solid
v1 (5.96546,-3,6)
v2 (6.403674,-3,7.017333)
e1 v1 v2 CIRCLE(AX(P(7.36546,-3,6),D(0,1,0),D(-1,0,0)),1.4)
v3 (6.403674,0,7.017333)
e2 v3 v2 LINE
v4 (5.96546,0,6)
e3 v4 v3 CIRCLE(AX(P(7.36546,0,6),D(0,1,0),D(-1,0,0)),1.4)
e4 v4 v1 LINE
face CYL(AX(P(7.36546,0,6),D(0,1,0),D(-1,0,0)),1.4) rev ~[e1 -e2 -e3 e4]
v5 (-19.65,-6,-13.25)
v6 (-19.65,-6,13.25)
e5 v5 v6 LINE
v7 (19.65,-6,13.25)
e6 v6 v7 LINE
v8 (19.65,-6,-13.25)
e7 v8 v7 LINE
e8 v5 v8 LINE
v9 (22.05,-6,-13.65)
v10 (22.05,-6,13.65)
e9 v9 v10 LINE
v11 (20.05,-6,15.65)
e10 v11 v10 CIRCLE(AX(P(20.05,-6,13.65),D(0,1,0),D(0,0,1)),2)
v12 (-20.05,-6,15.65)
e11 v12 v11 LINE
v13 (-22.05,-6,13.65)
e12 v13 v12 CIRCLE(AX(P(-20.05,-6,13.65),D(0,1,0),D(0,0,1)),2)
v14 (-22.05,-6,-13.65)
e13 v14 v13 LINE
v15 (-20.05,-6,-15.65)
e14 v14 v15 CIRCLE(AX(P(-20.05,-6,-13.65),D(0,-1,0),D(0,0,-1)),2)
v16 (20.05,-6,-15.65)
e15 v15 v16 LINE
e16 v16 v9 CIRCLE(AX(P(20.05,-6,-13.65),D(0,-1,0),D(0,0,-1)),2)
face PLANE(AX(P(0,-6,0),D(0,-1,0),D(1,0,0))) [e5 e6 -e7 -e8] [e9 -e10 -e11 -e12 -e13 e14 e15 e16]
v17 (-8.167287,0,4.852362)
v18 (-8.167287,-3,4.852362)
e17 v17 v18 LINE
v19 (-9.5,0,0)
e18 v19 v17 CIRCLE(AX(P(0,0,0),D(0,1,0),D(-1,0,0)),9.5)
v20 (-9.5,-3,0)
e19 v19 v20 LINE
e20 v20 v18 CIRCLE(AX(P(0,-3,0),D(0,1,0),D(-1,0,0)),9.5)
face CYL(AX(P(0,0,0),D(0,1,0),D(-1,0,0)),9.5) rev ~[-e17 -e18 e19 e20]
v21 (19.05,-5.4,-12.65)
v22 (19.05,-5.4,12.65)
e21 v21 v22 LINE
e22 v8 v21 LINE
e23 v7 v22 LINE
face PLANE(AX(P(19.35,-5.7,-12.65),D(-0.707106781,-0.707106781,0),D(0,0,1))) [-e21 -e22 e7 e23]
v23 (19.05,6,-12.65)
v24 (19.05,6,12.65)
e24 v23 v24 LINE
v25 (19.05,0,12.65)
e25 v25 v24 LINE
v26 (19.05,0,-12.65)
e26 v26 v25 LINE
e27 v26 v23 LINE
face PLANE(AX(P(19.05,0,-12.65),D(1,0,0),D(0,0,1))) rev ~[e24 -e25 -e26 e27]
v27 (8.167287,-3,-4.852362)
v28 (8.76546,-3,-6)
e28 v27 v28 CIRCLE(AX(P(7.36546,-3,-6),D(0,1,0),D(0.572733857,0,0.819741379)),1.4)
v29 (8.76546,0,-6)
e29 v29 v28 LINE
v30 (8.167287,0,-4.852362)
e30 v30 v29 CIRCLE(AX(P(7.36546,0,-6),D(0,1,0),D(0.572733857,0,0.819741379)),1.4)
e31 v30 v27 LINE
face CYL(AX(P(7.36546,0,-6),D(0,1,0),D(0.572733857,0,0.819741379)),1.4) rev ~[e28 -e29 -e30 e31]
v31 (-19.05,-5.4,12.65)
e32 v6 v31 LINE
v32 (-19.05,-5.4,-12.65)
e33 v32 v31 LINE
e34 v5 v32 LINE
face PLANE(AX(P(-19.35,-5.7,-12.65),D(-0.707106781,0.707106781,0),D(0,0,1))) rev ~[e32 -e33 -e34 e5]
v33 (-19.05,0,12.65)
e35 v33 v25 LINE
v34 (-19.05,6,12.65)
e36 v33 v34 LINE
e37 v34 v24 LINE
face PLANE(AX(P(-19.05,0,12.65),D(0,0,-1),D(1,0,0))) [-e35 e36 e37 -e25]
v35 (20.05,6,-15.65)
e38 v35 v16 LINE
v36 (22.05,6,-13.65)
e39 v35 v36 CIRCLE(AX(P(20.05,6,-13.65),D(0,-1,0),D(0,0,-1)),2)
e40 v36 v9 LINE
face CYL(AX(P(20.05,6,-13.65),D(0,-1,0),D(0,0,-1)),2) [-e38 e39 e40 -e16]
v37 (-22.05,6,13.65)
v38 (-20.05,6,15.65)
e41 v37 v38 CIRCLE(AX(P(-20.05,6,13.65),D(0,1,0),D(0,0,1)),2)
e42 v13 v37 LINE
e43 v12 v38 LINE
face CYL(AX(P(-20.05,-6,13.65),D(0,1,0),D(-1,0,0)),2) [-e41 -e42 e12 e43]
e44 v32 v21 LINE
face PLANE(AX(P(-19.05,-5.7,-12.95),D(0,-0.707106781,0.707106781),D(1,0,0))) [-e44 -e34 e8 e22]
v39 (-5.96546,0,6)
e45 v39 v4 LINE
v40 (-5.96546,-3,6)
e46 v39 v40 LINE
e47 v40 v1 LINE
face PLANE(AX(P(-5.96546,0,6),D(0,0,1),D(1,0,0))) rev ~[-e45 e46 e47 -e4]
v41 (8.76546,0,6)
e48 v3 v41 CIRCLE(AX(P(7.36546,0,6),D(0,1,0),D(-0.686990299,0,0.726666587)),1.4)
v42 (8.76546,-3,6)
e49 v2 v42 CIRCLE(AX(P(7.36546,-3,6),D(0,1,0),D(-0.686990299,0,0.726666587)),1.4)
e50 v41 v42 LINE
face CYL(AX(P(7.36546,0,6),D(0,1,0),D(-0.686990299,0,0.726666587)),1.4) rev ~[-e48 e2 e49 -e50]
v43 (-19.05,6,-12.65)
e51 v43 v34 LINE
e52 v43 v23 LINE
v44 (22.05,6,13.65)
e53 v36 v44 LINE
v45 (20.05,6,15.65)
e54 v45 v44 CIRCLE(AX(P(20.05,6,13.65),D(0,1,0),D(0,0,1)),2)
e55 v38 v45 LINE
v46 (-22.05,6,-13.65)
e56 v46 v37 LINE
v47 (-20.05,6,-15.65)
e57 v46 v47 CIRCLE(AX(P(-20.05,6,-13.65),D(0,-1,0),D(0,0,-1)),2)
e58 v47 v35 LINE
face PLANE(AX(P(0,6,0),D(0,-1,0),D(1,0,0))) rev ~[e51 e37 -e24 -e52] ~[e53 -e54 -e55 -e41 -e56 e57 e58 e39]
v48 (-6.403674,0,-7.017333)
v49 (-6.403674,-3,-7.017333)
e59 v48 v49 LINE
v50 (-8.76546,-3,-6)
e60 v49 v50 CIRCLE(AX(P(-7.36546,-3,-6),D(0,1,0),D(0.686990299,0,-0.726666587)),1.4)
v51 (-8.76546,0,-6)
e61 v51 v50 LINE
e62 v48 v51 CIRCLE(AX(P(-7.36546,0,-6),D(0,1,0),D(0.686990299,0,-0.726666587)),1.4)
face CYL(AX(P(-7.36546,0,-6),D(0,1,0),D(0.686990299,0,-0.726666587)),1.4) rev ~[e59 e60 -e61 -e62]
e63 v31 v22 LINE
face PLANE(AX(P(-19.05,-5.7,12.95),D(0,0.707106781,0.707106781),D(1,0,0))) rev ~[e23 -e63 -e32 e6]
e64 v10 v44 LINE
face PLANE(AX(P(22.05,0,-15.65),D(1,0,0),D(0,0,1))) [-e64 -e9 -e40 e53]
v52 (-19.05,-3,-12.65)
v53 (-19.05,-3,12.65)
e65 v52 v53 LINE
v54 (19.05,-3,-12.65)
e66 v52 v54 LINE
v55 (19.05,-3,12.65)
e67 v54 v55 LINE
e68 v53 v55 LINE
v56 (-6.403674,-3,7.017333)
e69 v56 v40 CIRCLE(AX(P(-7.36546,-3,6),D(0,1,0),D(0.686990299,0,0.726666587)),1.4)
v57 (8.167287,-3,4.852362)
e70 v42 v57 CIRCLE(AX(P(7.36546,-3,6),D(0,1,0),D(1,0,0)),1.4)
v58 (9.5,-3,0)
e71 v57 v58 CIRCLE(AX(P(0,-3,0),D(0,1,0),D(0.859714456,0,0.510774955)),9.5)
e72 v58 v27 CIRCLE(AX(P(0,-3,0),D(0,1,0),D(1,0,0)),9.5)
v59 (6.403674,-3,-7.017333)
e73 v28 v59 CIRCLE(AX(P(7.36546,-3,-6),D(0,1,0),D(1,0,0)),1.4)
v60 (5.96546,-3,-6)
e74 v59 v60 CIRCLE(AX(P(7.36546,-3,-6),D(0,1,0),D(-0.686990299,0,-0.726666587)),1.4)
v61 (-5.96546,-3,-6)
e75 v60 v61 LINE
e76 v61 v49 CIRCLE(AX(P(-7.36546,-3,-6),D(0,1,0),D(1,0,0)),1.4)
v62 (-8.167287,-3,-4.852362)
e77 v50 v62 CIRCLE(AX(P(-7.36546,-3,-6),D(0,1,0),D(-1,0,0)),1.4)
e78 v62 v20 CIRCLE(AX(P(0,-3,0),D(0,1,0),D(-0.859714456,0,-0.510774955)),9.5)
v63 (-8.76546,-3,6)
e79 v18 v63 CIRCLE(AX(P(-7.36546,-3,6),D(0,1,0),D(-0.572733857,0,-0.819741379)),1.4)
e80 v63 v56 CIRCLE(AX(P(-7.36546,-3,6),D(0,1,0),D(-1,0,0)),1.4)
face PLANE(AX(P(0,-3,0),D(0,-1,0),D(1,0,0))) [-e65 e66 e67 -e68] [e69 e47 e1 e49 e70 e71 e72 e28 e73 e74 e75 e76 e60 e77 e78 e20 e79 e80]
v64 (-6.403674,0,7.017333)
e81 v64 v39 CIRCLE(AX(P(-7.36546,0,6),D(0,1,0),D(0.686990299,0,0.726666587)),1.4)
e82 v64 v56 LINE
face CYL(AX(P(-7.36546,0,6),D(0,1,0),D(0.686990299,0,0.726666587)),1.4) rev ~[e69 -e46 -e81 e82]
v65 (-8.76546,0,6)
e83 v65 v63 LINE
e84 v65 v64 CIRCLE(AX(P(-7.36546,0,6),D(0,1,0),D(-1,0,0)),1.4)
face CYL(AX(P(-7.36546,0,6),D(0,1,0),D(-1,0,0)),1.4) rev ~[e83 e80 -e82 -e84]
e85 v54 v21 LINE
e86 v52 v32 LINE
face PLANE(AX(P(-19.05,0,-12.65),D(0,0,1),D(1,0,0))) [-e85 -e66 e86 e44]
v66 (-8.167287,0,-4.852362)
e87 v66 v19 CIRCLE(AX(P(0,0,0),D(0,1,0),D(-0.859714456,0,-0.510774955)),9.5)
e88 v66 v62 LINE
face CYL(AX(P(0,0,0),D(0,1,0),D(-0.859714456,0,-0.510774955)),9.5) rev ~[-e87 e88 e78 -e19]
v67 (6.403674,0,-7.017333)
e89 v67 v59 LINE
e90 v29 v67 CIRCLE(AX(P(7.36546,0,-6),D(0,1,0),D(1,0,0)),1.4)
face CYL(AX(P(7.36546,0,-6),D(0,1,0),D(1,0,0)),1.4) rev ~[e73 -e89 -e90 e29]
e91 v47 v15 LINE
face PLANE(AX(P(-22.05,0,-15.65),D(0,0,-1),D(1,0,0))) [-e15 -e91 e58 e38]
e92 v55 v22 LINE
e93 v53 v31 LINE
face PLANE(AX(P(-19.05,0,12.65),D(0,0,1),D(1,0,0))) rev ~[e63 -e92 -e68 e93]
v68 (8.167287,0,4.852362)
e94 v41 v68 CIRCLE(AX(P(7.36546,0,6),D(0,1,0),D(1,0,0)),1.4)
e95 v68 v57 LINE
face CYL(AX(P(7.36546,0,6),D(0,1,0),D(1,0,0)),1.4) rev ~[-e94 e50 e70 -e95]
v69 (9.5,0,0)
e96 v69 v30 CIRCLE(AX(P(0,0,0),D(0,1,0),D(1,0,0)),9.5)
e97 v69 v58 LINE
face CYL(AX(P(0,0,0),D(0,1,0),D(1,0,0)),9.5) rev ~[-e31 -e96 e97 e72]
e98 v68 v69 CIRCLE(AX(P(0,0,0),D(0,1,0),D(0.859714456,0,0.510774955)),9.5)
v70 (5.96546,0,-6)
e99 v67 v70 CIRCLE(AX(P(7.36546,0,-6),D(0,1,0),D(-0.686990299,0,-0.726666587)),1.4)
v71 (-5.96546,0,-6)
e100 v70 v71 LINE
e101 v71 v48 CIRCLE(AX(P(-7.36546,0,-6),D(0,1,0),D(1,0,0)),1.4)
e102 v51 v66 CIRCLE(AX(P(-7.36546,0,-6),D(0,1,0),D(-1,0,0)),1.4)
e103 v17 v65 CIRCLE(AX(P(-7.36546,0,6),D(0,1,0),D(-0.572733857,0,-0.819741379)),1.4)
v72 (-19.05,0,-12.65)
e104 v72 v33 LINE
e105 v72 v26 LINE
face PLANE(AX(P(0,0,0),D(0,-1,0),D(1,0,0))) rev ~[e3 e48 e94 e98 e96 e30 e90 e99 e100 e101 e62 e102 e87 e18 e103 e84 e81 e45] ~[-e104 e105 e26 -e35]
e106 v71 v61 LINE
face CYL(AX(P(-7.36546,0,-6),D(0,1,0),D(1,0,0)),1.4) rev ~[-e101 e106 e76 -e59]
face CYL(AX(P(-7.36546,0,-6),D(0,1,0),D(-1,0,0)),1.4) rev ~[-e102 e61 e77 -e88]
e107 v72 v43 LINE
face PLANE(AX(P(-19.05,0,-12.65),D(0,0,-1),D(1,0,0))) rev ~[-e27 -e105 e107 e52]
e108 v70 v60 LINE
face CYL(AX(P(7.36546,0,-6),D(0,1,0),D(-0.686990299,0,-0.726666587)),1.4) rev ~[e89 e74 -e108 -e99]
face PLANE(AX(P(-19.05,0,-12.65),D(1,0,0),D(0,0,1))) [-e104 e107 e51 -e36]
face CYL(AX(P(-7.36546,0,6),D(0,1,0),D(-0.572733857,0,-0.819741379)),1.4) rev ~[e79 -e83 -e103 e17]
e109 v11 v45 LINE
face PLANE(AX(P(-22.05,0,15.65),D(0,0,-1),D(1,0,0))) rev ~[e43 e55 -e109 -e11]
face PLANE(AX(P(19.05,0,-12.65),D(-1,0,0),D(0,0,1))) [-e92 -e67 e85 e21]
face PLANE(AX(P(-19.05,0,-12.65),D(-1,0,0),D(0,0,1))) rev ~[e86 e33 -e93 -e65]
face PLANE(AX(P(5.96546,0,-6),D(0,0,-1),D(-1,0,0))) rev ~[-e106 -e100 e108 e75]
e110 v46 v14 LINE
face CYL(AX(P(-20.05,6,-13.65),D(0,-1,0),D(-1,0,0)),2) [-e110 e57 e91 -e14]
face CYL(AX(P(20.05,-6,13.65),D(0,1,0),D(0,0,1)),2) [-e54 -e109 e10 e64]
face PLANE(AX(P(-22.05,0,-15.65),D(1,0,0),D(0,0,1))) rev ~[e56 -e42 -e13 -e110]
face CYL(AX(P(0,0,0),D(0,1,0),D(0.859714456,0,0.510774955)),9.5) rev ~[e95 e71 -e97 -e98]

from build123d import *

# Parameters (mm, degrees)
F0_W     = 38.1
F0_H     = 25.3
F1_DEPTH = 3
F0_W_2   = 44.1
F0_H_2   = 31.3
F2_DEPTH = 6
F3_DEPTH = 6
F4_SIZE  = 0.6
F5_R     = 2


# Not quite as in the source:
# - a feature names something its author has since deleted; it is built from what else it names


with BuildPart() as f1:
    # F0 (on Front) → F1 (new body)
    with BuildSketch(Plane.XZ):
        Rectangle(F0_W, F0_H)
        with BuildLine():
            ThreePointArc((-8.6746757864, 9), (0, 12.5), (8.6746757864, 9))
            Line((8.6746757864, 9), (12.5, 9))
            Line((12.5, 9), (12.5, 0))
            Line((12.5, 0), (12.5, -9))
            Line((12.5, -9), (8.6746757864, -9))
            ThreePointArc((8.6746757864, -9), (0, -12.5), (-8.6746757864, -9))
            Line((-8.6746757864, -9), (-12.5, -9))
            Line((-12.5, -9), (-12.5, 0))
            Line((-12.5, 0), (-12.5, 9))
            Line((-12.5, 9), (-8.6746757864, 9))
        make_face(mode=Mode.SUBTRACT)
        with BuildLine():
            ThreePointArc((-3.0413812651, 9), (0, 9.5), (3.0413812651, 9))
            Line((3.0413812651, 9), (8.6746757864, 9))
            ThreePointArc((8.6746757864, 9), (0, 12.5), (-8.6746757864, 9))
            Line((-8.6746757864, 9), (-3.0413812651, 9))
        make_face()
        with BuildLine():
            ThreePointArc((12.5, 0), (11.5039872942, -4.8896090165), (8.6746757864, -9))
            Line((8.6746757864, -9), (12.5, -9))
            Line((12.5, -9), (12.5, 0))
        make_face()
        with BuildLine():
            Line((8.6746757864, -9), (3.0413812651, -9))
            ThreePointArc((3.0413812651, -9), (0, -9.5), (-3.0413812651, -9))
            Line((-3.0413812651, -9), (-8.6746757864, -9))
            ThreePointArc((-8.6746757864, -9), (0, -12.5), (8.6746757864, -9))
        make_face()
        with BuildLine():
            Line((-12.5, -9), (-8.6746757864, -9))
            ThreePointArc((-8.6746757864, -9), (-11.5039872942, -4.8896090165), (-12.5, 0))
            Line((-12.5, 0), (-12.5, -9))
        make_face()
        with BuildLine():
            Line((-3.0413812651, 9), (3.0413812651, 9))
            ThreePointArc((3.0413812651, 9), (0, 9.5), (-3.0413812651, 9))
        make_face()
        with BuildLine():
            ThreePointArc((-3.0413812651, -9), (0, -9.5), (3.0413812651, -9))
            Line((3.0413812651, -9), (-3.0413812651, -9))
        make_face()
        with BuildLine():
            ThreePointArc((-6.4036735124, 7.0173332219), (-4.8254540539, 8.1832141102), (-3.0413812651, 9))
            Line((-3.0413812651, 9), (-8.6746757864, 9))
            ThreePointArc((-8.6746757864, 9), (-11.5039872942, 4.8896090165), (-12.5, 0))
            ThreePointArc((-12.5, 0), (-11.5039872942, -4.8896090165), (-8.6746757864, -9))
            Line((-8.6746757864, -9), (-3.0413812651, -9))
            ThreePointArc((-3.0413812651, -9), (-4.8254540539, -8.1832141102), (-6.4036735124, -7.0173332219))
            ThreePointArc((-6.4036735124, -7.0173332219), (-7.9193096463, -7.2857878881), (-8.7654599313, -6))
            Line((-8.7654599313, -6), (-9.5, -6))
            Line((-9.5, -6), (-9.5, 0))
            Line((-9.5, 0), (-9.5, 6))
            Line((-9.5, 6), (-8.7654599313, 6))
            ThreePointArc((-8.7654599313, 6), (-7.9193096463, 7.2857878881), (-6.4036735124, 7.0173332219))
        make_face()
        with BuildLine():
            Line((9.5, 6), (9.5, 0))
            Line((9.5, 0), (9.5, -6))
            Line((9.5, -6), (8.7654599313, -6))
            ThreePointArc((8.7654599313, -6), (7.9193096463, -7.2857878881), (6.4036735124, -7.0173332219))
            ThreePointArc((6.4036735124, -7.0173332219), (4.8254540539, -8.1832141102), (3.0413812651, -9))
            Line((3.0413812651, -9), (8.6746757864, -9))
            ThreePointArc((8.6746757864, -9), (11.5039872942, -4.8896090165), (12.5, 0))
            ThreePointArc((12.5, 0), (11.5039872942, 4.8896090165), (8.6746757864, 9))
            Line((8.6746757864, 9), (3.0413812651, 9))
            ThreePointArc((3.0413812651, 9), (4.8254540539, 8.1832141102), (6.4036735124, 7.0173332219))
            ThreePointArc((6.4036735124, 7.0173332219), (7.9193096463, 7.2857878881), (8.7654599313, 6))
            Line((8.7654599313, 6), (9.5, 6))
        make_face()
        with BuildLine():
            Line((9.5, -6), (9.5, 0))
            ThreePointArc((9.5, 0), (9.1607649693, -2.5160256709), (8.1672873313, -4.852362069))
            ThreePointArc((8.1672873313, -4.852362069), (8.6069425852, -5.3529135915), (8.7654599313, -6))
            Line((8.7654599313, -6), (9.5, -6))
        make_face()
        with BuildLine():
            ThreePointArc((-8.7654599313, -6), (-8.6069425852, -5.3529135915), (-8.1672873313, -4.852362069))
            ThreePointArc((-8.1672873313, -4.852362069), (-9.1607649693, -2.5160256709), (-9.5, 0))
            Line((-9.5, 0), (-9.5, -6))
            Line((-9.5, -6), (-8.7654599313, -6))
        make_face()
        with BuildLine():
            ThreePointArc((-9.5, 0), (-9.1607649693, 2.5160256709), (-8.1672873313, 4.852362069))
            ThreePointArc((-8.1672873313, 4.852362069), (-8.6069425852, 5.3529135915), (-8.7654599313, 6))
            Line((-8.7654599313, 6), (-9.5, 6))
            Line((-9.5, 6), (-9.5, 0))
        make_face()
        with BuildLine():
            ThreePointArc((8.1672873313, 4.852362069), (9.1607649693, 2.5160256709), (9.5, 0))
            Line((9.5, 0), (9.5, 6))
            Line((9.5, 6), (8.7654599313, 6))
            ThreePointArc((8.7654599313, 6), (8.6069425852, 5.3529135915), (8.1672873313, 4.852362069))
        make_face()
        with BuildLine():
            ThreePointArc((-12.5, 0), (-11.5039872942, 4.8896090165), (-8.6746757864, 9))
            Line((-8.6746757864, 9), (-12.5, 9))
            Line((-12.5, 9), (-12.5, 0))
        make_face()
        with BuildLine():
            Line((12.5, 9), (8.6746757864, 9))
            ThreePointArc((8.6746757864, 9), (11.5039872942, 4.8896090165), (12.5, 0))
            Line((12.5, 0), (12.5, 9))
        make_face()
        with BuildLine():
            ThreePointArc((5.9654599313, 6), (6.0796720432, 6.5538497149), (6.4036735124, 7.0173332219))
            ThreePointArc((6.4036735124, 7.0173332219), (4.8254540539, 8.1832141102), (3.0413812651, 9))
            Line((3.0413812651, 9), (-3.0413812651, 9))
            ThreePointArc((-3.0413812651, 9), (-4.8254540539, 8.1832141102), (-6.4036735124, 7.0173332219))
            ThreePointArc((-6.4036735124, 7.0173332219), (-6.0796720432, 6.5538497149), (-5.9654599313, 6))
            Line((-5.9654599313, 6), (5.9654599313, 6))
        make_face()
        with BuildLine():
            ThreePointArc((3.0413812651, -9), (4.8254540539, -8.1832141102), (6.4036735124, -7.0173332219))
            ThreePointArc((6.4036735124, -7.0173332219), (6.0796720432, -6.5538497149), (5.9654599313, -6))
            Line((5.9654599313, -6), (-5.9654599313, -6))
            ThreePointArc((-5.9654599313, -6), (-6.0796720432, -6.5538497149), (-6.4036735124, -7.0173332219))
            ThreePointArc((-6.4036735124, -7.0173332219), (-4.8254540539, -8.1832141102), (-3.0413812651, -9))
            Line((-3.0413812651, -9), (3.0413812651, -9))
        make_face()
    extrude(amount=F1_DEPTH)

    # F0 (on Front) → F2 (join)
    with BuildSketch(Plane.XZ):
        Rectangle(F0_W_2, F0_H_2)
        Rectangle(F0_W, F0_H, mode=Mode.SUBTRACT)
    extrude(amount=F2_DEPTH)

    # F0 (on Front) → F3 (join)
    with BuildSketch(Plane.XZ):
        Rectangle(F0_W_2, F0_H_2)
        Rectangle(F0_W, F0_H, mode=Mode.SUBTRACT)
    extrude(amount=-F3_DEPTH)

    # F4
    f4_edges = [f1.edges().sort_by_distance(p)[0] for p in [
        (-19.05, -6, 0),
        (0, -6, -12.65),
        (0, -6, 12.65),
        (19.05, -6, 0),
    ]]
    chamfer(f4_edges, length=F4_SIZE)

    # F5
    f5_edges = [f1.edges().sort_by_distance(p)[0] for p in [
        (22.05, 0, 15.65),
        (22.05, 0, -15.65),
        (-22.05, 0, -15.65),
        (-22.05, 0, 15.65),
    ]]
    fillet(f5_edges, radius=F5_R)


solid = f1.part
